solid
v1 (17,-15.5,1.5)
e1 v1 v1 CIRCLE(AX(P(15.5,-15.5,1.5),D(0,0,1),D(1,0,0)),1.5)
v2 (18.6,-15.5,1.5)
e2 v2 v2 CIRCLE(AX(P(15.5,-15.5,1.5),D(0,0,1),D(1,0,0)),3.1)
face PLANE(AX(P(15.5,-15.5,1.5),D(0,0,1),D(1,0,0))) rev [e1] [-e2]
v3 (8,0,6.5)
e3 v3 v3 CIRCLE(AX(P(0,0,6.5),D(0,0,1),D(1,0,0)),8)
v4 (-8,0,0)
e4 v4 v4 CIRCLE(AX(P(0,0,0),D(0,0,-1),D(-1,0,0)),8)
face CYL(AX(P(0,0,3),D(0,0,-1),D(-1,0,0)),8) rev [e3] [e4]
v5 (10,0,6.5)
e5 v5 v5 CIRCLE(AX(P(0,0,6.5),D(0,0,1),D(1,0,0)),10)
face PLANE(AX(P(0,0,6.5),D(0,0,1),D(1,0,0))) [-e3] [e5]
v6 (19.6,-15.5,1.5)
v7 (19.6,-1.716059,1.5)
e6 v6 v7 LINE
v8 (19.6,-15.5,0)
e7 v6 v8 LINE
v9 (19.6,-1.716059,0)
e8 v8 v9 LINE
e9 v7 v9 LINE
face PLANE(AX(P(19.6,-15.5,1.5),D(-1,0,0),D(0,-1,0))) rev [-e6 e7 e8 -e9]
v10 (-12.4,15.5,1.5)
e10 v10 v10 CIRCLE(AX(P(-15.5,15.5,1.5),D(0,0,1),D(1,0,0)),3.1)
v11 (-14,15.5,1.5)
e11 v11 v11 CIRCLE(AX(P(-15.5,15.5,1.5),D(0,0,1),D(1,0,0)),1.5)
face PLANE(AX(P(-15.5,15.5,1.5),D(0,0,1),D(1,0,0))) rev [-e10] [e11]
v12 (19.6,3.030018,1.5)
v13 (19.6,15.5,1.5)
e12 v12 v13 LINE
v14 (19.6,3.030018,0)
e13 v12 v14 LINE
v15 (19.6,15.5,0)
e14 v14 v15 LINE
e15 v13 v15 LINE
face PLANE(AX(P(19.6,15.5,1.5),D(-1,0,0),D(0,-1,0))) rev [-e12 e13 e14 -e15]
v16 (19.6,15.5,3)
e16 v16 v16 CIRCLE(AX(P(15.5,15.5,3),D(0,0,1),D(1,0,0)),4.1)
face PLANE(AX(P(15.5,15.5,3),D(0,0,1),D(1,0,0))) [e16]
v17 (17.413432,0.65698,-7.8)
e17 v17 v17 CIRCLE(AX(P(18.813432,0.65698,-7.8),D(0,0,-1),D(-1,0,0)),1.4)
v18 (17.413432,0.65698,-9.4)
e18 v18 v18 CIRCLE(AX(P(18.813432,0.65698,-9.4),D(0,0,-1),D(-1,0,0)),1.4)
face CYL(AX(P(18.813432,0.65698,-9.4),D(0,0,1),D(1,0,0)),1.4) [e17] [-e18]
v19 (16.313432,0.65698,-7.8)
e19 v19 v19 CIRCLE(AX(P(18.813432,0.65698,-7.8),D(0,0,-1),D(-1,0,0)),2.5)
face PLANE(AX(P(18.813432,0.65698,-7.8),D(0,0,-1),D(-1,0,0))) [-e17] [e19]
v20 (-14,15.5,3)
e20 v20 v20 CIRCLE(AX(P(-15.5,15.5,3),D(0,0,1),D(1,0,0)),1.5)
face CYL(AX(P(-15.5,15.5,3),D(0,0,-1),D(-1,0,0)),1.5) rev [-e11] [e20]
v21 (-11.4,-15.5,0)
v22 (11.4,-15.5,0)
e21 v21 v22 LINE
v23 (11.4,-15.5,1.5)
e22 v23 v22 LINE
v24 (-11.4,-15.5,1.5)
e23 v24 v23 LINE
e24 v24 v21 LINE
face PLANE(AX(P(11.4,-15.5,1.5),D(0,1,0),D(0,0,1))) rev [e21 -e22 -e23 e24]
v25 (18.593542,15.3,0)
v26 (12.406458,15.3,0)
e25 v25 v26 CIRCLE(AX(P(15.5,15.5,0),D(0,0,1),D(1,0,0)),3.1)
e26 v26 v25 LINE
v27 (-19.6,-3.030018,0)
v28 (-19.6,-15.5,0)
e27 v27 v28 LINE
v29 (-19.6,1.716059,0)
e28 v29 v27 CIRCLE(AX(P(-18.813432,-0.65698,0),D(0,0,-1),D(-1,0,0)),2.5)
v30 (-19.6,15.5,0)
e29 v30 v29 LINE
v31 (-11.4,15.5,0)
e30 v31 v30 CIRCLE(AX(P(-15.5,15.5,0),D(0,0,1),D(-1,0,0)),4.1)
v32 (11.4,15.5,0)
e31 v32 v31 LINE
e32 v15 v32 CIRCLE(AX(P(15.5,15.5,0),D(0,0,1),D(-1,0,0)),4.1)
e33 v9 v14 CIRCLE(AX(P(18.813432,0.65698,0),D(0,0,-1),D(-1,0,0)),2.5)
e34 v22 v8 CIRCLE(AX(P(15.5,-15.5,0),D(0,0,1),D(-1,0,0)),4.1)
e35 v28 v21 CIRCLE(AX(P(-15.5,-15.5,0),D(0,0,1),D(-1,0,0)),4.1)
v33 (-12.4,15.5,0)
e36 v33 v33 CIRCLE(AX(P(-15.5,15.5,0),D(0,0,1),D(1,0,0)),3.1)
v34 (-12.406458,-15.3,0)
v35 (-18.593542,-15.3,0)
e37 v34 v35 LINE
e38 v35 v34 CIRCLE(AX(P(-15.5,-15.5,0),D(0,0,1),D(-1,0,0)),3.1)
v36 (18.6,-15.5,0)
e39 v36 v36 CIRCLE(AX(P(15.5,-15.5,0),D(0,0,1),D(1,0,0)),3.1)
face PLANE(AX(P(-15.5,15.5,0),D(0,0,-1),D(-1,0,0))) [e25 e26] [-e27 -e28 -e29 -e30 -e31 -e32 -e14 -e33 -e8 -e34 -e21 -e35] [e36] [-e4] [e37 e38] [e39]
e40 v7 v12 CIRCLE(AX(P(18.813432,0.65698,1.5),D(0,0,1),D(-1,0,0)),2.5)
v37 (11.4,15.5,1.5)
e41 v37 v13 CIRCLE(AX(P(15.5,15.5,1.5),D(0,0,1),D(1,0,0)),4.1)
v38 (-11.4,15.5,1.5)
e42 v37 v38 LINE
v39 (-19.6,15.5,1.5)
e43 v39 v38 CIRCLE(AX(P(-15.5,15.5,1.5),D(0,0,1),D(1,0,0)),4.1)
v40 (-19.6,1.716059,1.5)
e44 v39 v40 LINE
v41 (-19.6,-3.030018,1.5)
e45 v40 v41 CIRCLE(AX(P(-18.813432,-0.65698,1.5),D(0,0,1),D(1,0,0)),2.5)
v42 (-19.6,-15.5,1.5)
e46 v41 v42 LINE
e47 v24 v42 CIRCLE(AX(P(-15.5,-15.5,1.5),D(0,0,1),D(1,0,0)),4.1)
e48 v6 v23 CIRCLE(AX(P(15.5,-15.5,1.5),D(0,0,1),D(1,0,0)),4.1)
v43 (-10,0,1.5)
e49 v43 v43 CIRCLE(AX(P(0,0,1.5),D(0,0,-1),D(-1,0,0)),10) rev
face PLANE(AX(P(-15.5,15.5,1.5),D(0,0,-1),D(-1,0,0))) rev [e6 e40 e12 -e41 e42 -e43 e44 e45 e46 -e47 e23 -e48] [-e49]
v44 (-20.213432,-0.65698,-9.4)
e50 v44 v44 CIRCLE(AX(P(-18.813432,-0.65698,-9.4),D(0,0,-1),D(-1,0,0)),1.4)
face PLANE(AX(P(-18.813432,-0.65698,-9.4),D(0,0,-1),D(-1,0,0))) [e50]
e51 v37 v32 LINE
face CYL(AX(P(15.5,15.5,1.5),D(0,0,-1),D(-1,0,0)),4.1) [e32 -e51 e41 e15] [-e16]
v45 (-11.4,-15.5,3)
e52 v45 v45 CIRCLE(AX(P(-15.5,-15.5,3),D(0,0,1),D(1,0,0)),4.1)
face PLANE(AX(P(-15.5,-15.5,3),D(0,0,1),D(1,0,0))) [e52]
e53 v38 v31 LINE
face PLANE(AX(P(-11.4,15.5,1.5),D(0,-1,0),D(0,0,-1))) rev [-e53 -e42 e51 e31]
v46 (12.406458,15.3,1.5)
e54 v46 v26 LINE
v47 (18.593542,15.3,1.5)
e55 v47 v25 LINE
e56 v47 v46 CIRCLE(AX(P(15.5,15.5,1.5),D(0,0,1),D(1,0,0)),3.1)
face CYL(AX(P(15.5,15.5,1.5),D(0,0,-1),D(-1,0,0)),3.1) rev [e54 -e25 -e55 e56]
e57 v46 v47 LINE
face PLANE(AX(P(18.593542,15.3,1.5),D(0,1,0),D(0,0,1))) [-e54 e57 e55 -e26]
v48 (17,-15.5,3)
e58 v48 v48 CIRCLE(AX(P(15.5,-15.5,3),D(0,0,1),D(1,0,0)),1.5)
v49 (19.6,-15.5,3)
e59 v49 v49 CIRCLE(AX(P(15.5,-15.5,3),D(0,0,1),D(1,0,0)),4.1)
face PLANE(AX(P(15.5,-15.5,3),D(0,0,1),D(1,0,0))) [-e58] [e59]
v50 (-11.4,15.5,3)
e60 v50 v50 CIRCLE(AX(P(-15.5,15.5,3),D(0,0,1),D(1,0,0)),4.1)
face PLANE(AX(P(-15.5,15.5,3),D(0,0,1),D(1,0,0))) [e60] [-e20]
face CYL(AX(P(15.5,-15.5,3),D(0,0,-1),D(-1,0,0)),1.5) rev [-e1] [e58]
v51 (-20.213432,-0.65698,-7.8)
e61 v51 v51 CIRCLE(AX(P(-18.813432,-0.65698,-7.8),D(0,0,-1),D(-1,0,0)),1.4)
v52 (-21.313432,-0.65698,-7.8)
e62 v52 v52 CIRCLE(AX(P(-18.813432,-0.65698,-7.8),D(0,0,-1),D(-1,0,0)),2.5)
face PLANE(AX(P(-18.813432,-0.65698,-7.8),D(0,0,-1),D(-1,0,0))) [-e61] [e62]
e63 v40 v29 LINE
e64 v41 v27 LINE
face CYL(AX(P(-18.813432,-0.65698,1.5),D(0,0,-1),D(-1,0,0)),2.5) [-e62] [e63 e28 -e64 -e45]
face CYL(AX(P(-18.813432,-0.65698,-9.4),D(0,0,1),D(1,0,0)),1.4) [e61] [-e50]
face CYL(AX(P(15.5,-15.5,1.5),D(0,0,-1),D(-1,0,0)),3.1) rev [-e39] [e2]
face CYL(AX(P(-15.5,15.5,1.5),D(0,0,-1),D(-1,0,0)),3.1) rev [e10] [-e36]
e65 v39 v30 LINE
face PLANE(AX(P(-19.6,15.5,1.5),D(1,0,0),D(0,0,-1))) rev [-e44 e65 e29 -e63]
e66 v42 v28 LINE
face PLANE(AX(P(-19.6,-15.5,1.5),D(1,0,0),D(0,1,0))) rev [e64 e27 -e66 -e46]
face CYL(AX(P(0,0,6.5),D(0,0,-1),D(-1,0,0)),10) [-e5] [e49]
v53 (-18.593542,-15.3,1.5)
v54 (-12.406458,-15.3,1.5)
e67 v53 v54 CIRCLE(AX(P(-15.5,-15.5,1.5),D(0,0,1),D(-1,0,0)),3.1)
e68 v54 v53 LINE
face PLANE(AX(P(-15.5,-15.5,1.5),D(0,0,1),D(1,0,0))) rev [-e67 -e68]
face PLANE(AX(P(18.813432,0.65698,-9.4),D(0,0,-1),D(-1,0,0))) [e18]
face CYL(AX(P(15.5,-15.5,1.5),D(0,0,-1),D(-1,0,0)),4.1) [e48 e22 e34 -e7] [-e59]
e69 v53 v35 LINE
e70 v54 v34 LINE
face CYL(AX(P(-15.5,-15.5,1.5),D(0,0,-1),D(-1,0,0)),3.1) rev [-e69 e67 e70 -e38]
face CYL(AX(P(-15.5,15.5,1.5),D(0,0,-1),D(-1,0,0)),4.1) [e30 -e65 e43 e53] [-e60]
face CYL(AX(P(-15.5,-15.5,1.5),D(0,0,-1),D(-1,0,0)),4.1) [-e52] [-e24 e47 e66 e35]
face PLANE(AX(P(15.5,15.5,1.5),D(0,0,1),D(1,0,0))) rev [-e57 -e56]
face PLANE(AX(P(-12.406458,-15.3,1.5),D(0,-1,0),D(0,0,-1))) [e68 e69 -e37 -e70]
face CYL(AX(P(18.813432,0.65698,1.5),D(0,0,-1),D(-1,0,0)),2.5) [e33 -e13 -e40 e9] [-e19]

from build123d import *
from build123d.topology import SkipClean

# Parameters (mm, degrees)
SKETCH1_R      = 3.1
EXTRUDE1_DEPTH = 1.5
SKETCH2_R      = 4.1
SKETCH2_R_2    = 1.5
EXTRUDE2_DEPTH = 1.5
EXTRUDE3_START = 7.8
SKETCH3_R      = 2.5
EXTRUDE3_DEPTH = 7.8
SKETCH4_R      = 1.4
EXTRUDE4_DEPTH = 1.6
SKETCH5_R      = 8
EXTRUDE5_DEPTH = 31.443100442
SKETCH6_R      = 10
SKETCH6_R_2    = 8
EXTRUDE6_DEPTH = 5


with BuildPart() as part:
    # Sketch1 → Extrude1 (new body)
    with BuildSketch(Plane.XY):
        with BuildLine():
            Line((-11.4, 15.5), (11.4, 15.5))
            ThreePointArc((11.4, 15.5), (15.5, 19.6), (19.6, 15.5))
            Line((19.6, 15.5), (19.6, 3.03001766))
            ThreePointArc((19.6, 3.03001766), (21.313431552, 0.656979507), (19.6, -1.716058647))
            Line((19.6, -1.716058647), (19.6, -15.5))
            ThreePointArc((19.6, -15.5), (15.5, -19.6), (11.4, -15.5))
            Line((11.4, -15.5), (-11.4, -15.5))
            ThreePointArc((-11.4, -15.5), (-15.5, -19.6), (-19.6, -15.5))
            Line((-19.6, -15.5), (-19.6, -3.03001766))
            ThreePointArc((-19.6, -3.03001766), (-21.313431552, -0.656979507), (-19.6, 1.716058647))
            Line((-19.6, 1.716058647), (-19.6, 15.5))
            ThreePointArc((-19.6, 15.5), (-15.5, 19.6), (-11.4, 15.5))
        make_face()
        with Locations((15.5, -15.5)):
            Circle(SKETCH1_R, mode=Mode.SUBTRACT)
        with Locations((-15.5, 15.5)):
            Circle(SKETCH1_R, mode=Mode.SUBTRACT)
        with BuildLine():
            Line((-12.40645834, -15.3), (-18.59354166, -15.3))
            ThreePointArc((-18.59354166, -15.3), (-15.5, -18.6), (-12.40645834, -15.3))
        make_face(mode=Mode.SUBTRACT)
        with BuildLine():
            Line((18.59354166, 15.3), (12.40645834, 15.3))
            ThreePointArc((12.40645834, 15.3), (15.5, 18.6), (18.59354166, 15.3))
        make_face(mode=Mode.SUBTRACT)
    extrude(amount=EXTRUDE1_DEPTH)

    # Sketch2 → Extrude2 (add)
    # profile 1 of 4: a face of its own
    with SkipClean():  # the faces are left unmerged after this step: merging them gives an invalid solid
        with BuildSketch(Plane.XY.offset(1.5)):
            with Locations((-15.5, 15.5)):
                Circle(SKETCH2_R)
            with Locations((-15.5, 15.5)):
                Circle(SKETCH2_R_2, mode=Mode.SUBTRACT)
        # profile 2 of 4: a face of its own
        with BuildSketch(Plane.XY.offset(1.5)):
            with Locations((15.5, 15.5)):
                Circle(SKETCH2_R)
        # profile 3 of 4: a face of its own
        with BuildSketch(Plane.XY.offset(1.5)):
            with Locations((15.5, -15.5)):
                Circle(SKETCH2_R)
            with Locations((15.5, -15.5)):
                Circle(SKETCH2_R_2, mode=Mode.SUBTRACT)
        # profile 4 of 4: a face of its own
        with BuildSketch(Plane.XY.offset(1.5)):
            with Locations((-15.5, -15.5)):
                Circle(SKETCH2_R)
        extrude(amount=EXTRUDE2_DEPTH)
    add(part.part.scale(1), mode=Mode.REPLACE)  # the faces are merged on a copy

    # Sketch3 → Extrude3 (add)
    with BuildSketch(Plane(origin=(0, 0, 0), x_dir=(-1, 0, 0), z_dir=(0, 0, -1)).offset(EXTRUDE3_START)):
        with Locations((18.813431552, -0.656979507)):
            Circle(SKETCH3_R)
        with Locations((-18.813431552, 0.656979507)):
            Circle(SKETCH3_R)
    extrude(amount=-EXTRUDE3_DEPTH)

    # Sketch4 → Extrude4 (add)
    with BuildSketch(Plane(origin=(0, 0, -7.8), x_dir=(-1, 0, 0), z_dir=(0, 0, -1))):
        with Locations((-18.813431552, 0.656979507)):
            Circle(SKETCH4_R)
        with Locations((18.813431552, -0.656979507)):
            Circle(SKETCH4_R)
    extrude(amount=EXTRUDE4_DEPTH)

    # Sketch5 → Extrude5 (cut, through all)
    with BuildSketch(Plane(origin=(0, 0, 0), x_dir=(-1, 0, 0), z_dir=(0, 0, -1))):
        Circle(SKETCH5_R)
    extrude(amount=-EXTRUDE5_DEPTH, mode=Mode.SUBTRACT)

    # Sketch6 → Extrude6 (add)
    with SkipClean():  # the faces are left unmerged after this step: merging them gives an invalid solid
        with BuildSketch(Plane.XY.offset(1.5)):
            Circle(SKETCH6_R)
            Circle(SKETCH6_R_2, mode=Mode.SUBTRACT)
        extrude(amount=EXTRUDE6_DEPTH)


solid = part.part
